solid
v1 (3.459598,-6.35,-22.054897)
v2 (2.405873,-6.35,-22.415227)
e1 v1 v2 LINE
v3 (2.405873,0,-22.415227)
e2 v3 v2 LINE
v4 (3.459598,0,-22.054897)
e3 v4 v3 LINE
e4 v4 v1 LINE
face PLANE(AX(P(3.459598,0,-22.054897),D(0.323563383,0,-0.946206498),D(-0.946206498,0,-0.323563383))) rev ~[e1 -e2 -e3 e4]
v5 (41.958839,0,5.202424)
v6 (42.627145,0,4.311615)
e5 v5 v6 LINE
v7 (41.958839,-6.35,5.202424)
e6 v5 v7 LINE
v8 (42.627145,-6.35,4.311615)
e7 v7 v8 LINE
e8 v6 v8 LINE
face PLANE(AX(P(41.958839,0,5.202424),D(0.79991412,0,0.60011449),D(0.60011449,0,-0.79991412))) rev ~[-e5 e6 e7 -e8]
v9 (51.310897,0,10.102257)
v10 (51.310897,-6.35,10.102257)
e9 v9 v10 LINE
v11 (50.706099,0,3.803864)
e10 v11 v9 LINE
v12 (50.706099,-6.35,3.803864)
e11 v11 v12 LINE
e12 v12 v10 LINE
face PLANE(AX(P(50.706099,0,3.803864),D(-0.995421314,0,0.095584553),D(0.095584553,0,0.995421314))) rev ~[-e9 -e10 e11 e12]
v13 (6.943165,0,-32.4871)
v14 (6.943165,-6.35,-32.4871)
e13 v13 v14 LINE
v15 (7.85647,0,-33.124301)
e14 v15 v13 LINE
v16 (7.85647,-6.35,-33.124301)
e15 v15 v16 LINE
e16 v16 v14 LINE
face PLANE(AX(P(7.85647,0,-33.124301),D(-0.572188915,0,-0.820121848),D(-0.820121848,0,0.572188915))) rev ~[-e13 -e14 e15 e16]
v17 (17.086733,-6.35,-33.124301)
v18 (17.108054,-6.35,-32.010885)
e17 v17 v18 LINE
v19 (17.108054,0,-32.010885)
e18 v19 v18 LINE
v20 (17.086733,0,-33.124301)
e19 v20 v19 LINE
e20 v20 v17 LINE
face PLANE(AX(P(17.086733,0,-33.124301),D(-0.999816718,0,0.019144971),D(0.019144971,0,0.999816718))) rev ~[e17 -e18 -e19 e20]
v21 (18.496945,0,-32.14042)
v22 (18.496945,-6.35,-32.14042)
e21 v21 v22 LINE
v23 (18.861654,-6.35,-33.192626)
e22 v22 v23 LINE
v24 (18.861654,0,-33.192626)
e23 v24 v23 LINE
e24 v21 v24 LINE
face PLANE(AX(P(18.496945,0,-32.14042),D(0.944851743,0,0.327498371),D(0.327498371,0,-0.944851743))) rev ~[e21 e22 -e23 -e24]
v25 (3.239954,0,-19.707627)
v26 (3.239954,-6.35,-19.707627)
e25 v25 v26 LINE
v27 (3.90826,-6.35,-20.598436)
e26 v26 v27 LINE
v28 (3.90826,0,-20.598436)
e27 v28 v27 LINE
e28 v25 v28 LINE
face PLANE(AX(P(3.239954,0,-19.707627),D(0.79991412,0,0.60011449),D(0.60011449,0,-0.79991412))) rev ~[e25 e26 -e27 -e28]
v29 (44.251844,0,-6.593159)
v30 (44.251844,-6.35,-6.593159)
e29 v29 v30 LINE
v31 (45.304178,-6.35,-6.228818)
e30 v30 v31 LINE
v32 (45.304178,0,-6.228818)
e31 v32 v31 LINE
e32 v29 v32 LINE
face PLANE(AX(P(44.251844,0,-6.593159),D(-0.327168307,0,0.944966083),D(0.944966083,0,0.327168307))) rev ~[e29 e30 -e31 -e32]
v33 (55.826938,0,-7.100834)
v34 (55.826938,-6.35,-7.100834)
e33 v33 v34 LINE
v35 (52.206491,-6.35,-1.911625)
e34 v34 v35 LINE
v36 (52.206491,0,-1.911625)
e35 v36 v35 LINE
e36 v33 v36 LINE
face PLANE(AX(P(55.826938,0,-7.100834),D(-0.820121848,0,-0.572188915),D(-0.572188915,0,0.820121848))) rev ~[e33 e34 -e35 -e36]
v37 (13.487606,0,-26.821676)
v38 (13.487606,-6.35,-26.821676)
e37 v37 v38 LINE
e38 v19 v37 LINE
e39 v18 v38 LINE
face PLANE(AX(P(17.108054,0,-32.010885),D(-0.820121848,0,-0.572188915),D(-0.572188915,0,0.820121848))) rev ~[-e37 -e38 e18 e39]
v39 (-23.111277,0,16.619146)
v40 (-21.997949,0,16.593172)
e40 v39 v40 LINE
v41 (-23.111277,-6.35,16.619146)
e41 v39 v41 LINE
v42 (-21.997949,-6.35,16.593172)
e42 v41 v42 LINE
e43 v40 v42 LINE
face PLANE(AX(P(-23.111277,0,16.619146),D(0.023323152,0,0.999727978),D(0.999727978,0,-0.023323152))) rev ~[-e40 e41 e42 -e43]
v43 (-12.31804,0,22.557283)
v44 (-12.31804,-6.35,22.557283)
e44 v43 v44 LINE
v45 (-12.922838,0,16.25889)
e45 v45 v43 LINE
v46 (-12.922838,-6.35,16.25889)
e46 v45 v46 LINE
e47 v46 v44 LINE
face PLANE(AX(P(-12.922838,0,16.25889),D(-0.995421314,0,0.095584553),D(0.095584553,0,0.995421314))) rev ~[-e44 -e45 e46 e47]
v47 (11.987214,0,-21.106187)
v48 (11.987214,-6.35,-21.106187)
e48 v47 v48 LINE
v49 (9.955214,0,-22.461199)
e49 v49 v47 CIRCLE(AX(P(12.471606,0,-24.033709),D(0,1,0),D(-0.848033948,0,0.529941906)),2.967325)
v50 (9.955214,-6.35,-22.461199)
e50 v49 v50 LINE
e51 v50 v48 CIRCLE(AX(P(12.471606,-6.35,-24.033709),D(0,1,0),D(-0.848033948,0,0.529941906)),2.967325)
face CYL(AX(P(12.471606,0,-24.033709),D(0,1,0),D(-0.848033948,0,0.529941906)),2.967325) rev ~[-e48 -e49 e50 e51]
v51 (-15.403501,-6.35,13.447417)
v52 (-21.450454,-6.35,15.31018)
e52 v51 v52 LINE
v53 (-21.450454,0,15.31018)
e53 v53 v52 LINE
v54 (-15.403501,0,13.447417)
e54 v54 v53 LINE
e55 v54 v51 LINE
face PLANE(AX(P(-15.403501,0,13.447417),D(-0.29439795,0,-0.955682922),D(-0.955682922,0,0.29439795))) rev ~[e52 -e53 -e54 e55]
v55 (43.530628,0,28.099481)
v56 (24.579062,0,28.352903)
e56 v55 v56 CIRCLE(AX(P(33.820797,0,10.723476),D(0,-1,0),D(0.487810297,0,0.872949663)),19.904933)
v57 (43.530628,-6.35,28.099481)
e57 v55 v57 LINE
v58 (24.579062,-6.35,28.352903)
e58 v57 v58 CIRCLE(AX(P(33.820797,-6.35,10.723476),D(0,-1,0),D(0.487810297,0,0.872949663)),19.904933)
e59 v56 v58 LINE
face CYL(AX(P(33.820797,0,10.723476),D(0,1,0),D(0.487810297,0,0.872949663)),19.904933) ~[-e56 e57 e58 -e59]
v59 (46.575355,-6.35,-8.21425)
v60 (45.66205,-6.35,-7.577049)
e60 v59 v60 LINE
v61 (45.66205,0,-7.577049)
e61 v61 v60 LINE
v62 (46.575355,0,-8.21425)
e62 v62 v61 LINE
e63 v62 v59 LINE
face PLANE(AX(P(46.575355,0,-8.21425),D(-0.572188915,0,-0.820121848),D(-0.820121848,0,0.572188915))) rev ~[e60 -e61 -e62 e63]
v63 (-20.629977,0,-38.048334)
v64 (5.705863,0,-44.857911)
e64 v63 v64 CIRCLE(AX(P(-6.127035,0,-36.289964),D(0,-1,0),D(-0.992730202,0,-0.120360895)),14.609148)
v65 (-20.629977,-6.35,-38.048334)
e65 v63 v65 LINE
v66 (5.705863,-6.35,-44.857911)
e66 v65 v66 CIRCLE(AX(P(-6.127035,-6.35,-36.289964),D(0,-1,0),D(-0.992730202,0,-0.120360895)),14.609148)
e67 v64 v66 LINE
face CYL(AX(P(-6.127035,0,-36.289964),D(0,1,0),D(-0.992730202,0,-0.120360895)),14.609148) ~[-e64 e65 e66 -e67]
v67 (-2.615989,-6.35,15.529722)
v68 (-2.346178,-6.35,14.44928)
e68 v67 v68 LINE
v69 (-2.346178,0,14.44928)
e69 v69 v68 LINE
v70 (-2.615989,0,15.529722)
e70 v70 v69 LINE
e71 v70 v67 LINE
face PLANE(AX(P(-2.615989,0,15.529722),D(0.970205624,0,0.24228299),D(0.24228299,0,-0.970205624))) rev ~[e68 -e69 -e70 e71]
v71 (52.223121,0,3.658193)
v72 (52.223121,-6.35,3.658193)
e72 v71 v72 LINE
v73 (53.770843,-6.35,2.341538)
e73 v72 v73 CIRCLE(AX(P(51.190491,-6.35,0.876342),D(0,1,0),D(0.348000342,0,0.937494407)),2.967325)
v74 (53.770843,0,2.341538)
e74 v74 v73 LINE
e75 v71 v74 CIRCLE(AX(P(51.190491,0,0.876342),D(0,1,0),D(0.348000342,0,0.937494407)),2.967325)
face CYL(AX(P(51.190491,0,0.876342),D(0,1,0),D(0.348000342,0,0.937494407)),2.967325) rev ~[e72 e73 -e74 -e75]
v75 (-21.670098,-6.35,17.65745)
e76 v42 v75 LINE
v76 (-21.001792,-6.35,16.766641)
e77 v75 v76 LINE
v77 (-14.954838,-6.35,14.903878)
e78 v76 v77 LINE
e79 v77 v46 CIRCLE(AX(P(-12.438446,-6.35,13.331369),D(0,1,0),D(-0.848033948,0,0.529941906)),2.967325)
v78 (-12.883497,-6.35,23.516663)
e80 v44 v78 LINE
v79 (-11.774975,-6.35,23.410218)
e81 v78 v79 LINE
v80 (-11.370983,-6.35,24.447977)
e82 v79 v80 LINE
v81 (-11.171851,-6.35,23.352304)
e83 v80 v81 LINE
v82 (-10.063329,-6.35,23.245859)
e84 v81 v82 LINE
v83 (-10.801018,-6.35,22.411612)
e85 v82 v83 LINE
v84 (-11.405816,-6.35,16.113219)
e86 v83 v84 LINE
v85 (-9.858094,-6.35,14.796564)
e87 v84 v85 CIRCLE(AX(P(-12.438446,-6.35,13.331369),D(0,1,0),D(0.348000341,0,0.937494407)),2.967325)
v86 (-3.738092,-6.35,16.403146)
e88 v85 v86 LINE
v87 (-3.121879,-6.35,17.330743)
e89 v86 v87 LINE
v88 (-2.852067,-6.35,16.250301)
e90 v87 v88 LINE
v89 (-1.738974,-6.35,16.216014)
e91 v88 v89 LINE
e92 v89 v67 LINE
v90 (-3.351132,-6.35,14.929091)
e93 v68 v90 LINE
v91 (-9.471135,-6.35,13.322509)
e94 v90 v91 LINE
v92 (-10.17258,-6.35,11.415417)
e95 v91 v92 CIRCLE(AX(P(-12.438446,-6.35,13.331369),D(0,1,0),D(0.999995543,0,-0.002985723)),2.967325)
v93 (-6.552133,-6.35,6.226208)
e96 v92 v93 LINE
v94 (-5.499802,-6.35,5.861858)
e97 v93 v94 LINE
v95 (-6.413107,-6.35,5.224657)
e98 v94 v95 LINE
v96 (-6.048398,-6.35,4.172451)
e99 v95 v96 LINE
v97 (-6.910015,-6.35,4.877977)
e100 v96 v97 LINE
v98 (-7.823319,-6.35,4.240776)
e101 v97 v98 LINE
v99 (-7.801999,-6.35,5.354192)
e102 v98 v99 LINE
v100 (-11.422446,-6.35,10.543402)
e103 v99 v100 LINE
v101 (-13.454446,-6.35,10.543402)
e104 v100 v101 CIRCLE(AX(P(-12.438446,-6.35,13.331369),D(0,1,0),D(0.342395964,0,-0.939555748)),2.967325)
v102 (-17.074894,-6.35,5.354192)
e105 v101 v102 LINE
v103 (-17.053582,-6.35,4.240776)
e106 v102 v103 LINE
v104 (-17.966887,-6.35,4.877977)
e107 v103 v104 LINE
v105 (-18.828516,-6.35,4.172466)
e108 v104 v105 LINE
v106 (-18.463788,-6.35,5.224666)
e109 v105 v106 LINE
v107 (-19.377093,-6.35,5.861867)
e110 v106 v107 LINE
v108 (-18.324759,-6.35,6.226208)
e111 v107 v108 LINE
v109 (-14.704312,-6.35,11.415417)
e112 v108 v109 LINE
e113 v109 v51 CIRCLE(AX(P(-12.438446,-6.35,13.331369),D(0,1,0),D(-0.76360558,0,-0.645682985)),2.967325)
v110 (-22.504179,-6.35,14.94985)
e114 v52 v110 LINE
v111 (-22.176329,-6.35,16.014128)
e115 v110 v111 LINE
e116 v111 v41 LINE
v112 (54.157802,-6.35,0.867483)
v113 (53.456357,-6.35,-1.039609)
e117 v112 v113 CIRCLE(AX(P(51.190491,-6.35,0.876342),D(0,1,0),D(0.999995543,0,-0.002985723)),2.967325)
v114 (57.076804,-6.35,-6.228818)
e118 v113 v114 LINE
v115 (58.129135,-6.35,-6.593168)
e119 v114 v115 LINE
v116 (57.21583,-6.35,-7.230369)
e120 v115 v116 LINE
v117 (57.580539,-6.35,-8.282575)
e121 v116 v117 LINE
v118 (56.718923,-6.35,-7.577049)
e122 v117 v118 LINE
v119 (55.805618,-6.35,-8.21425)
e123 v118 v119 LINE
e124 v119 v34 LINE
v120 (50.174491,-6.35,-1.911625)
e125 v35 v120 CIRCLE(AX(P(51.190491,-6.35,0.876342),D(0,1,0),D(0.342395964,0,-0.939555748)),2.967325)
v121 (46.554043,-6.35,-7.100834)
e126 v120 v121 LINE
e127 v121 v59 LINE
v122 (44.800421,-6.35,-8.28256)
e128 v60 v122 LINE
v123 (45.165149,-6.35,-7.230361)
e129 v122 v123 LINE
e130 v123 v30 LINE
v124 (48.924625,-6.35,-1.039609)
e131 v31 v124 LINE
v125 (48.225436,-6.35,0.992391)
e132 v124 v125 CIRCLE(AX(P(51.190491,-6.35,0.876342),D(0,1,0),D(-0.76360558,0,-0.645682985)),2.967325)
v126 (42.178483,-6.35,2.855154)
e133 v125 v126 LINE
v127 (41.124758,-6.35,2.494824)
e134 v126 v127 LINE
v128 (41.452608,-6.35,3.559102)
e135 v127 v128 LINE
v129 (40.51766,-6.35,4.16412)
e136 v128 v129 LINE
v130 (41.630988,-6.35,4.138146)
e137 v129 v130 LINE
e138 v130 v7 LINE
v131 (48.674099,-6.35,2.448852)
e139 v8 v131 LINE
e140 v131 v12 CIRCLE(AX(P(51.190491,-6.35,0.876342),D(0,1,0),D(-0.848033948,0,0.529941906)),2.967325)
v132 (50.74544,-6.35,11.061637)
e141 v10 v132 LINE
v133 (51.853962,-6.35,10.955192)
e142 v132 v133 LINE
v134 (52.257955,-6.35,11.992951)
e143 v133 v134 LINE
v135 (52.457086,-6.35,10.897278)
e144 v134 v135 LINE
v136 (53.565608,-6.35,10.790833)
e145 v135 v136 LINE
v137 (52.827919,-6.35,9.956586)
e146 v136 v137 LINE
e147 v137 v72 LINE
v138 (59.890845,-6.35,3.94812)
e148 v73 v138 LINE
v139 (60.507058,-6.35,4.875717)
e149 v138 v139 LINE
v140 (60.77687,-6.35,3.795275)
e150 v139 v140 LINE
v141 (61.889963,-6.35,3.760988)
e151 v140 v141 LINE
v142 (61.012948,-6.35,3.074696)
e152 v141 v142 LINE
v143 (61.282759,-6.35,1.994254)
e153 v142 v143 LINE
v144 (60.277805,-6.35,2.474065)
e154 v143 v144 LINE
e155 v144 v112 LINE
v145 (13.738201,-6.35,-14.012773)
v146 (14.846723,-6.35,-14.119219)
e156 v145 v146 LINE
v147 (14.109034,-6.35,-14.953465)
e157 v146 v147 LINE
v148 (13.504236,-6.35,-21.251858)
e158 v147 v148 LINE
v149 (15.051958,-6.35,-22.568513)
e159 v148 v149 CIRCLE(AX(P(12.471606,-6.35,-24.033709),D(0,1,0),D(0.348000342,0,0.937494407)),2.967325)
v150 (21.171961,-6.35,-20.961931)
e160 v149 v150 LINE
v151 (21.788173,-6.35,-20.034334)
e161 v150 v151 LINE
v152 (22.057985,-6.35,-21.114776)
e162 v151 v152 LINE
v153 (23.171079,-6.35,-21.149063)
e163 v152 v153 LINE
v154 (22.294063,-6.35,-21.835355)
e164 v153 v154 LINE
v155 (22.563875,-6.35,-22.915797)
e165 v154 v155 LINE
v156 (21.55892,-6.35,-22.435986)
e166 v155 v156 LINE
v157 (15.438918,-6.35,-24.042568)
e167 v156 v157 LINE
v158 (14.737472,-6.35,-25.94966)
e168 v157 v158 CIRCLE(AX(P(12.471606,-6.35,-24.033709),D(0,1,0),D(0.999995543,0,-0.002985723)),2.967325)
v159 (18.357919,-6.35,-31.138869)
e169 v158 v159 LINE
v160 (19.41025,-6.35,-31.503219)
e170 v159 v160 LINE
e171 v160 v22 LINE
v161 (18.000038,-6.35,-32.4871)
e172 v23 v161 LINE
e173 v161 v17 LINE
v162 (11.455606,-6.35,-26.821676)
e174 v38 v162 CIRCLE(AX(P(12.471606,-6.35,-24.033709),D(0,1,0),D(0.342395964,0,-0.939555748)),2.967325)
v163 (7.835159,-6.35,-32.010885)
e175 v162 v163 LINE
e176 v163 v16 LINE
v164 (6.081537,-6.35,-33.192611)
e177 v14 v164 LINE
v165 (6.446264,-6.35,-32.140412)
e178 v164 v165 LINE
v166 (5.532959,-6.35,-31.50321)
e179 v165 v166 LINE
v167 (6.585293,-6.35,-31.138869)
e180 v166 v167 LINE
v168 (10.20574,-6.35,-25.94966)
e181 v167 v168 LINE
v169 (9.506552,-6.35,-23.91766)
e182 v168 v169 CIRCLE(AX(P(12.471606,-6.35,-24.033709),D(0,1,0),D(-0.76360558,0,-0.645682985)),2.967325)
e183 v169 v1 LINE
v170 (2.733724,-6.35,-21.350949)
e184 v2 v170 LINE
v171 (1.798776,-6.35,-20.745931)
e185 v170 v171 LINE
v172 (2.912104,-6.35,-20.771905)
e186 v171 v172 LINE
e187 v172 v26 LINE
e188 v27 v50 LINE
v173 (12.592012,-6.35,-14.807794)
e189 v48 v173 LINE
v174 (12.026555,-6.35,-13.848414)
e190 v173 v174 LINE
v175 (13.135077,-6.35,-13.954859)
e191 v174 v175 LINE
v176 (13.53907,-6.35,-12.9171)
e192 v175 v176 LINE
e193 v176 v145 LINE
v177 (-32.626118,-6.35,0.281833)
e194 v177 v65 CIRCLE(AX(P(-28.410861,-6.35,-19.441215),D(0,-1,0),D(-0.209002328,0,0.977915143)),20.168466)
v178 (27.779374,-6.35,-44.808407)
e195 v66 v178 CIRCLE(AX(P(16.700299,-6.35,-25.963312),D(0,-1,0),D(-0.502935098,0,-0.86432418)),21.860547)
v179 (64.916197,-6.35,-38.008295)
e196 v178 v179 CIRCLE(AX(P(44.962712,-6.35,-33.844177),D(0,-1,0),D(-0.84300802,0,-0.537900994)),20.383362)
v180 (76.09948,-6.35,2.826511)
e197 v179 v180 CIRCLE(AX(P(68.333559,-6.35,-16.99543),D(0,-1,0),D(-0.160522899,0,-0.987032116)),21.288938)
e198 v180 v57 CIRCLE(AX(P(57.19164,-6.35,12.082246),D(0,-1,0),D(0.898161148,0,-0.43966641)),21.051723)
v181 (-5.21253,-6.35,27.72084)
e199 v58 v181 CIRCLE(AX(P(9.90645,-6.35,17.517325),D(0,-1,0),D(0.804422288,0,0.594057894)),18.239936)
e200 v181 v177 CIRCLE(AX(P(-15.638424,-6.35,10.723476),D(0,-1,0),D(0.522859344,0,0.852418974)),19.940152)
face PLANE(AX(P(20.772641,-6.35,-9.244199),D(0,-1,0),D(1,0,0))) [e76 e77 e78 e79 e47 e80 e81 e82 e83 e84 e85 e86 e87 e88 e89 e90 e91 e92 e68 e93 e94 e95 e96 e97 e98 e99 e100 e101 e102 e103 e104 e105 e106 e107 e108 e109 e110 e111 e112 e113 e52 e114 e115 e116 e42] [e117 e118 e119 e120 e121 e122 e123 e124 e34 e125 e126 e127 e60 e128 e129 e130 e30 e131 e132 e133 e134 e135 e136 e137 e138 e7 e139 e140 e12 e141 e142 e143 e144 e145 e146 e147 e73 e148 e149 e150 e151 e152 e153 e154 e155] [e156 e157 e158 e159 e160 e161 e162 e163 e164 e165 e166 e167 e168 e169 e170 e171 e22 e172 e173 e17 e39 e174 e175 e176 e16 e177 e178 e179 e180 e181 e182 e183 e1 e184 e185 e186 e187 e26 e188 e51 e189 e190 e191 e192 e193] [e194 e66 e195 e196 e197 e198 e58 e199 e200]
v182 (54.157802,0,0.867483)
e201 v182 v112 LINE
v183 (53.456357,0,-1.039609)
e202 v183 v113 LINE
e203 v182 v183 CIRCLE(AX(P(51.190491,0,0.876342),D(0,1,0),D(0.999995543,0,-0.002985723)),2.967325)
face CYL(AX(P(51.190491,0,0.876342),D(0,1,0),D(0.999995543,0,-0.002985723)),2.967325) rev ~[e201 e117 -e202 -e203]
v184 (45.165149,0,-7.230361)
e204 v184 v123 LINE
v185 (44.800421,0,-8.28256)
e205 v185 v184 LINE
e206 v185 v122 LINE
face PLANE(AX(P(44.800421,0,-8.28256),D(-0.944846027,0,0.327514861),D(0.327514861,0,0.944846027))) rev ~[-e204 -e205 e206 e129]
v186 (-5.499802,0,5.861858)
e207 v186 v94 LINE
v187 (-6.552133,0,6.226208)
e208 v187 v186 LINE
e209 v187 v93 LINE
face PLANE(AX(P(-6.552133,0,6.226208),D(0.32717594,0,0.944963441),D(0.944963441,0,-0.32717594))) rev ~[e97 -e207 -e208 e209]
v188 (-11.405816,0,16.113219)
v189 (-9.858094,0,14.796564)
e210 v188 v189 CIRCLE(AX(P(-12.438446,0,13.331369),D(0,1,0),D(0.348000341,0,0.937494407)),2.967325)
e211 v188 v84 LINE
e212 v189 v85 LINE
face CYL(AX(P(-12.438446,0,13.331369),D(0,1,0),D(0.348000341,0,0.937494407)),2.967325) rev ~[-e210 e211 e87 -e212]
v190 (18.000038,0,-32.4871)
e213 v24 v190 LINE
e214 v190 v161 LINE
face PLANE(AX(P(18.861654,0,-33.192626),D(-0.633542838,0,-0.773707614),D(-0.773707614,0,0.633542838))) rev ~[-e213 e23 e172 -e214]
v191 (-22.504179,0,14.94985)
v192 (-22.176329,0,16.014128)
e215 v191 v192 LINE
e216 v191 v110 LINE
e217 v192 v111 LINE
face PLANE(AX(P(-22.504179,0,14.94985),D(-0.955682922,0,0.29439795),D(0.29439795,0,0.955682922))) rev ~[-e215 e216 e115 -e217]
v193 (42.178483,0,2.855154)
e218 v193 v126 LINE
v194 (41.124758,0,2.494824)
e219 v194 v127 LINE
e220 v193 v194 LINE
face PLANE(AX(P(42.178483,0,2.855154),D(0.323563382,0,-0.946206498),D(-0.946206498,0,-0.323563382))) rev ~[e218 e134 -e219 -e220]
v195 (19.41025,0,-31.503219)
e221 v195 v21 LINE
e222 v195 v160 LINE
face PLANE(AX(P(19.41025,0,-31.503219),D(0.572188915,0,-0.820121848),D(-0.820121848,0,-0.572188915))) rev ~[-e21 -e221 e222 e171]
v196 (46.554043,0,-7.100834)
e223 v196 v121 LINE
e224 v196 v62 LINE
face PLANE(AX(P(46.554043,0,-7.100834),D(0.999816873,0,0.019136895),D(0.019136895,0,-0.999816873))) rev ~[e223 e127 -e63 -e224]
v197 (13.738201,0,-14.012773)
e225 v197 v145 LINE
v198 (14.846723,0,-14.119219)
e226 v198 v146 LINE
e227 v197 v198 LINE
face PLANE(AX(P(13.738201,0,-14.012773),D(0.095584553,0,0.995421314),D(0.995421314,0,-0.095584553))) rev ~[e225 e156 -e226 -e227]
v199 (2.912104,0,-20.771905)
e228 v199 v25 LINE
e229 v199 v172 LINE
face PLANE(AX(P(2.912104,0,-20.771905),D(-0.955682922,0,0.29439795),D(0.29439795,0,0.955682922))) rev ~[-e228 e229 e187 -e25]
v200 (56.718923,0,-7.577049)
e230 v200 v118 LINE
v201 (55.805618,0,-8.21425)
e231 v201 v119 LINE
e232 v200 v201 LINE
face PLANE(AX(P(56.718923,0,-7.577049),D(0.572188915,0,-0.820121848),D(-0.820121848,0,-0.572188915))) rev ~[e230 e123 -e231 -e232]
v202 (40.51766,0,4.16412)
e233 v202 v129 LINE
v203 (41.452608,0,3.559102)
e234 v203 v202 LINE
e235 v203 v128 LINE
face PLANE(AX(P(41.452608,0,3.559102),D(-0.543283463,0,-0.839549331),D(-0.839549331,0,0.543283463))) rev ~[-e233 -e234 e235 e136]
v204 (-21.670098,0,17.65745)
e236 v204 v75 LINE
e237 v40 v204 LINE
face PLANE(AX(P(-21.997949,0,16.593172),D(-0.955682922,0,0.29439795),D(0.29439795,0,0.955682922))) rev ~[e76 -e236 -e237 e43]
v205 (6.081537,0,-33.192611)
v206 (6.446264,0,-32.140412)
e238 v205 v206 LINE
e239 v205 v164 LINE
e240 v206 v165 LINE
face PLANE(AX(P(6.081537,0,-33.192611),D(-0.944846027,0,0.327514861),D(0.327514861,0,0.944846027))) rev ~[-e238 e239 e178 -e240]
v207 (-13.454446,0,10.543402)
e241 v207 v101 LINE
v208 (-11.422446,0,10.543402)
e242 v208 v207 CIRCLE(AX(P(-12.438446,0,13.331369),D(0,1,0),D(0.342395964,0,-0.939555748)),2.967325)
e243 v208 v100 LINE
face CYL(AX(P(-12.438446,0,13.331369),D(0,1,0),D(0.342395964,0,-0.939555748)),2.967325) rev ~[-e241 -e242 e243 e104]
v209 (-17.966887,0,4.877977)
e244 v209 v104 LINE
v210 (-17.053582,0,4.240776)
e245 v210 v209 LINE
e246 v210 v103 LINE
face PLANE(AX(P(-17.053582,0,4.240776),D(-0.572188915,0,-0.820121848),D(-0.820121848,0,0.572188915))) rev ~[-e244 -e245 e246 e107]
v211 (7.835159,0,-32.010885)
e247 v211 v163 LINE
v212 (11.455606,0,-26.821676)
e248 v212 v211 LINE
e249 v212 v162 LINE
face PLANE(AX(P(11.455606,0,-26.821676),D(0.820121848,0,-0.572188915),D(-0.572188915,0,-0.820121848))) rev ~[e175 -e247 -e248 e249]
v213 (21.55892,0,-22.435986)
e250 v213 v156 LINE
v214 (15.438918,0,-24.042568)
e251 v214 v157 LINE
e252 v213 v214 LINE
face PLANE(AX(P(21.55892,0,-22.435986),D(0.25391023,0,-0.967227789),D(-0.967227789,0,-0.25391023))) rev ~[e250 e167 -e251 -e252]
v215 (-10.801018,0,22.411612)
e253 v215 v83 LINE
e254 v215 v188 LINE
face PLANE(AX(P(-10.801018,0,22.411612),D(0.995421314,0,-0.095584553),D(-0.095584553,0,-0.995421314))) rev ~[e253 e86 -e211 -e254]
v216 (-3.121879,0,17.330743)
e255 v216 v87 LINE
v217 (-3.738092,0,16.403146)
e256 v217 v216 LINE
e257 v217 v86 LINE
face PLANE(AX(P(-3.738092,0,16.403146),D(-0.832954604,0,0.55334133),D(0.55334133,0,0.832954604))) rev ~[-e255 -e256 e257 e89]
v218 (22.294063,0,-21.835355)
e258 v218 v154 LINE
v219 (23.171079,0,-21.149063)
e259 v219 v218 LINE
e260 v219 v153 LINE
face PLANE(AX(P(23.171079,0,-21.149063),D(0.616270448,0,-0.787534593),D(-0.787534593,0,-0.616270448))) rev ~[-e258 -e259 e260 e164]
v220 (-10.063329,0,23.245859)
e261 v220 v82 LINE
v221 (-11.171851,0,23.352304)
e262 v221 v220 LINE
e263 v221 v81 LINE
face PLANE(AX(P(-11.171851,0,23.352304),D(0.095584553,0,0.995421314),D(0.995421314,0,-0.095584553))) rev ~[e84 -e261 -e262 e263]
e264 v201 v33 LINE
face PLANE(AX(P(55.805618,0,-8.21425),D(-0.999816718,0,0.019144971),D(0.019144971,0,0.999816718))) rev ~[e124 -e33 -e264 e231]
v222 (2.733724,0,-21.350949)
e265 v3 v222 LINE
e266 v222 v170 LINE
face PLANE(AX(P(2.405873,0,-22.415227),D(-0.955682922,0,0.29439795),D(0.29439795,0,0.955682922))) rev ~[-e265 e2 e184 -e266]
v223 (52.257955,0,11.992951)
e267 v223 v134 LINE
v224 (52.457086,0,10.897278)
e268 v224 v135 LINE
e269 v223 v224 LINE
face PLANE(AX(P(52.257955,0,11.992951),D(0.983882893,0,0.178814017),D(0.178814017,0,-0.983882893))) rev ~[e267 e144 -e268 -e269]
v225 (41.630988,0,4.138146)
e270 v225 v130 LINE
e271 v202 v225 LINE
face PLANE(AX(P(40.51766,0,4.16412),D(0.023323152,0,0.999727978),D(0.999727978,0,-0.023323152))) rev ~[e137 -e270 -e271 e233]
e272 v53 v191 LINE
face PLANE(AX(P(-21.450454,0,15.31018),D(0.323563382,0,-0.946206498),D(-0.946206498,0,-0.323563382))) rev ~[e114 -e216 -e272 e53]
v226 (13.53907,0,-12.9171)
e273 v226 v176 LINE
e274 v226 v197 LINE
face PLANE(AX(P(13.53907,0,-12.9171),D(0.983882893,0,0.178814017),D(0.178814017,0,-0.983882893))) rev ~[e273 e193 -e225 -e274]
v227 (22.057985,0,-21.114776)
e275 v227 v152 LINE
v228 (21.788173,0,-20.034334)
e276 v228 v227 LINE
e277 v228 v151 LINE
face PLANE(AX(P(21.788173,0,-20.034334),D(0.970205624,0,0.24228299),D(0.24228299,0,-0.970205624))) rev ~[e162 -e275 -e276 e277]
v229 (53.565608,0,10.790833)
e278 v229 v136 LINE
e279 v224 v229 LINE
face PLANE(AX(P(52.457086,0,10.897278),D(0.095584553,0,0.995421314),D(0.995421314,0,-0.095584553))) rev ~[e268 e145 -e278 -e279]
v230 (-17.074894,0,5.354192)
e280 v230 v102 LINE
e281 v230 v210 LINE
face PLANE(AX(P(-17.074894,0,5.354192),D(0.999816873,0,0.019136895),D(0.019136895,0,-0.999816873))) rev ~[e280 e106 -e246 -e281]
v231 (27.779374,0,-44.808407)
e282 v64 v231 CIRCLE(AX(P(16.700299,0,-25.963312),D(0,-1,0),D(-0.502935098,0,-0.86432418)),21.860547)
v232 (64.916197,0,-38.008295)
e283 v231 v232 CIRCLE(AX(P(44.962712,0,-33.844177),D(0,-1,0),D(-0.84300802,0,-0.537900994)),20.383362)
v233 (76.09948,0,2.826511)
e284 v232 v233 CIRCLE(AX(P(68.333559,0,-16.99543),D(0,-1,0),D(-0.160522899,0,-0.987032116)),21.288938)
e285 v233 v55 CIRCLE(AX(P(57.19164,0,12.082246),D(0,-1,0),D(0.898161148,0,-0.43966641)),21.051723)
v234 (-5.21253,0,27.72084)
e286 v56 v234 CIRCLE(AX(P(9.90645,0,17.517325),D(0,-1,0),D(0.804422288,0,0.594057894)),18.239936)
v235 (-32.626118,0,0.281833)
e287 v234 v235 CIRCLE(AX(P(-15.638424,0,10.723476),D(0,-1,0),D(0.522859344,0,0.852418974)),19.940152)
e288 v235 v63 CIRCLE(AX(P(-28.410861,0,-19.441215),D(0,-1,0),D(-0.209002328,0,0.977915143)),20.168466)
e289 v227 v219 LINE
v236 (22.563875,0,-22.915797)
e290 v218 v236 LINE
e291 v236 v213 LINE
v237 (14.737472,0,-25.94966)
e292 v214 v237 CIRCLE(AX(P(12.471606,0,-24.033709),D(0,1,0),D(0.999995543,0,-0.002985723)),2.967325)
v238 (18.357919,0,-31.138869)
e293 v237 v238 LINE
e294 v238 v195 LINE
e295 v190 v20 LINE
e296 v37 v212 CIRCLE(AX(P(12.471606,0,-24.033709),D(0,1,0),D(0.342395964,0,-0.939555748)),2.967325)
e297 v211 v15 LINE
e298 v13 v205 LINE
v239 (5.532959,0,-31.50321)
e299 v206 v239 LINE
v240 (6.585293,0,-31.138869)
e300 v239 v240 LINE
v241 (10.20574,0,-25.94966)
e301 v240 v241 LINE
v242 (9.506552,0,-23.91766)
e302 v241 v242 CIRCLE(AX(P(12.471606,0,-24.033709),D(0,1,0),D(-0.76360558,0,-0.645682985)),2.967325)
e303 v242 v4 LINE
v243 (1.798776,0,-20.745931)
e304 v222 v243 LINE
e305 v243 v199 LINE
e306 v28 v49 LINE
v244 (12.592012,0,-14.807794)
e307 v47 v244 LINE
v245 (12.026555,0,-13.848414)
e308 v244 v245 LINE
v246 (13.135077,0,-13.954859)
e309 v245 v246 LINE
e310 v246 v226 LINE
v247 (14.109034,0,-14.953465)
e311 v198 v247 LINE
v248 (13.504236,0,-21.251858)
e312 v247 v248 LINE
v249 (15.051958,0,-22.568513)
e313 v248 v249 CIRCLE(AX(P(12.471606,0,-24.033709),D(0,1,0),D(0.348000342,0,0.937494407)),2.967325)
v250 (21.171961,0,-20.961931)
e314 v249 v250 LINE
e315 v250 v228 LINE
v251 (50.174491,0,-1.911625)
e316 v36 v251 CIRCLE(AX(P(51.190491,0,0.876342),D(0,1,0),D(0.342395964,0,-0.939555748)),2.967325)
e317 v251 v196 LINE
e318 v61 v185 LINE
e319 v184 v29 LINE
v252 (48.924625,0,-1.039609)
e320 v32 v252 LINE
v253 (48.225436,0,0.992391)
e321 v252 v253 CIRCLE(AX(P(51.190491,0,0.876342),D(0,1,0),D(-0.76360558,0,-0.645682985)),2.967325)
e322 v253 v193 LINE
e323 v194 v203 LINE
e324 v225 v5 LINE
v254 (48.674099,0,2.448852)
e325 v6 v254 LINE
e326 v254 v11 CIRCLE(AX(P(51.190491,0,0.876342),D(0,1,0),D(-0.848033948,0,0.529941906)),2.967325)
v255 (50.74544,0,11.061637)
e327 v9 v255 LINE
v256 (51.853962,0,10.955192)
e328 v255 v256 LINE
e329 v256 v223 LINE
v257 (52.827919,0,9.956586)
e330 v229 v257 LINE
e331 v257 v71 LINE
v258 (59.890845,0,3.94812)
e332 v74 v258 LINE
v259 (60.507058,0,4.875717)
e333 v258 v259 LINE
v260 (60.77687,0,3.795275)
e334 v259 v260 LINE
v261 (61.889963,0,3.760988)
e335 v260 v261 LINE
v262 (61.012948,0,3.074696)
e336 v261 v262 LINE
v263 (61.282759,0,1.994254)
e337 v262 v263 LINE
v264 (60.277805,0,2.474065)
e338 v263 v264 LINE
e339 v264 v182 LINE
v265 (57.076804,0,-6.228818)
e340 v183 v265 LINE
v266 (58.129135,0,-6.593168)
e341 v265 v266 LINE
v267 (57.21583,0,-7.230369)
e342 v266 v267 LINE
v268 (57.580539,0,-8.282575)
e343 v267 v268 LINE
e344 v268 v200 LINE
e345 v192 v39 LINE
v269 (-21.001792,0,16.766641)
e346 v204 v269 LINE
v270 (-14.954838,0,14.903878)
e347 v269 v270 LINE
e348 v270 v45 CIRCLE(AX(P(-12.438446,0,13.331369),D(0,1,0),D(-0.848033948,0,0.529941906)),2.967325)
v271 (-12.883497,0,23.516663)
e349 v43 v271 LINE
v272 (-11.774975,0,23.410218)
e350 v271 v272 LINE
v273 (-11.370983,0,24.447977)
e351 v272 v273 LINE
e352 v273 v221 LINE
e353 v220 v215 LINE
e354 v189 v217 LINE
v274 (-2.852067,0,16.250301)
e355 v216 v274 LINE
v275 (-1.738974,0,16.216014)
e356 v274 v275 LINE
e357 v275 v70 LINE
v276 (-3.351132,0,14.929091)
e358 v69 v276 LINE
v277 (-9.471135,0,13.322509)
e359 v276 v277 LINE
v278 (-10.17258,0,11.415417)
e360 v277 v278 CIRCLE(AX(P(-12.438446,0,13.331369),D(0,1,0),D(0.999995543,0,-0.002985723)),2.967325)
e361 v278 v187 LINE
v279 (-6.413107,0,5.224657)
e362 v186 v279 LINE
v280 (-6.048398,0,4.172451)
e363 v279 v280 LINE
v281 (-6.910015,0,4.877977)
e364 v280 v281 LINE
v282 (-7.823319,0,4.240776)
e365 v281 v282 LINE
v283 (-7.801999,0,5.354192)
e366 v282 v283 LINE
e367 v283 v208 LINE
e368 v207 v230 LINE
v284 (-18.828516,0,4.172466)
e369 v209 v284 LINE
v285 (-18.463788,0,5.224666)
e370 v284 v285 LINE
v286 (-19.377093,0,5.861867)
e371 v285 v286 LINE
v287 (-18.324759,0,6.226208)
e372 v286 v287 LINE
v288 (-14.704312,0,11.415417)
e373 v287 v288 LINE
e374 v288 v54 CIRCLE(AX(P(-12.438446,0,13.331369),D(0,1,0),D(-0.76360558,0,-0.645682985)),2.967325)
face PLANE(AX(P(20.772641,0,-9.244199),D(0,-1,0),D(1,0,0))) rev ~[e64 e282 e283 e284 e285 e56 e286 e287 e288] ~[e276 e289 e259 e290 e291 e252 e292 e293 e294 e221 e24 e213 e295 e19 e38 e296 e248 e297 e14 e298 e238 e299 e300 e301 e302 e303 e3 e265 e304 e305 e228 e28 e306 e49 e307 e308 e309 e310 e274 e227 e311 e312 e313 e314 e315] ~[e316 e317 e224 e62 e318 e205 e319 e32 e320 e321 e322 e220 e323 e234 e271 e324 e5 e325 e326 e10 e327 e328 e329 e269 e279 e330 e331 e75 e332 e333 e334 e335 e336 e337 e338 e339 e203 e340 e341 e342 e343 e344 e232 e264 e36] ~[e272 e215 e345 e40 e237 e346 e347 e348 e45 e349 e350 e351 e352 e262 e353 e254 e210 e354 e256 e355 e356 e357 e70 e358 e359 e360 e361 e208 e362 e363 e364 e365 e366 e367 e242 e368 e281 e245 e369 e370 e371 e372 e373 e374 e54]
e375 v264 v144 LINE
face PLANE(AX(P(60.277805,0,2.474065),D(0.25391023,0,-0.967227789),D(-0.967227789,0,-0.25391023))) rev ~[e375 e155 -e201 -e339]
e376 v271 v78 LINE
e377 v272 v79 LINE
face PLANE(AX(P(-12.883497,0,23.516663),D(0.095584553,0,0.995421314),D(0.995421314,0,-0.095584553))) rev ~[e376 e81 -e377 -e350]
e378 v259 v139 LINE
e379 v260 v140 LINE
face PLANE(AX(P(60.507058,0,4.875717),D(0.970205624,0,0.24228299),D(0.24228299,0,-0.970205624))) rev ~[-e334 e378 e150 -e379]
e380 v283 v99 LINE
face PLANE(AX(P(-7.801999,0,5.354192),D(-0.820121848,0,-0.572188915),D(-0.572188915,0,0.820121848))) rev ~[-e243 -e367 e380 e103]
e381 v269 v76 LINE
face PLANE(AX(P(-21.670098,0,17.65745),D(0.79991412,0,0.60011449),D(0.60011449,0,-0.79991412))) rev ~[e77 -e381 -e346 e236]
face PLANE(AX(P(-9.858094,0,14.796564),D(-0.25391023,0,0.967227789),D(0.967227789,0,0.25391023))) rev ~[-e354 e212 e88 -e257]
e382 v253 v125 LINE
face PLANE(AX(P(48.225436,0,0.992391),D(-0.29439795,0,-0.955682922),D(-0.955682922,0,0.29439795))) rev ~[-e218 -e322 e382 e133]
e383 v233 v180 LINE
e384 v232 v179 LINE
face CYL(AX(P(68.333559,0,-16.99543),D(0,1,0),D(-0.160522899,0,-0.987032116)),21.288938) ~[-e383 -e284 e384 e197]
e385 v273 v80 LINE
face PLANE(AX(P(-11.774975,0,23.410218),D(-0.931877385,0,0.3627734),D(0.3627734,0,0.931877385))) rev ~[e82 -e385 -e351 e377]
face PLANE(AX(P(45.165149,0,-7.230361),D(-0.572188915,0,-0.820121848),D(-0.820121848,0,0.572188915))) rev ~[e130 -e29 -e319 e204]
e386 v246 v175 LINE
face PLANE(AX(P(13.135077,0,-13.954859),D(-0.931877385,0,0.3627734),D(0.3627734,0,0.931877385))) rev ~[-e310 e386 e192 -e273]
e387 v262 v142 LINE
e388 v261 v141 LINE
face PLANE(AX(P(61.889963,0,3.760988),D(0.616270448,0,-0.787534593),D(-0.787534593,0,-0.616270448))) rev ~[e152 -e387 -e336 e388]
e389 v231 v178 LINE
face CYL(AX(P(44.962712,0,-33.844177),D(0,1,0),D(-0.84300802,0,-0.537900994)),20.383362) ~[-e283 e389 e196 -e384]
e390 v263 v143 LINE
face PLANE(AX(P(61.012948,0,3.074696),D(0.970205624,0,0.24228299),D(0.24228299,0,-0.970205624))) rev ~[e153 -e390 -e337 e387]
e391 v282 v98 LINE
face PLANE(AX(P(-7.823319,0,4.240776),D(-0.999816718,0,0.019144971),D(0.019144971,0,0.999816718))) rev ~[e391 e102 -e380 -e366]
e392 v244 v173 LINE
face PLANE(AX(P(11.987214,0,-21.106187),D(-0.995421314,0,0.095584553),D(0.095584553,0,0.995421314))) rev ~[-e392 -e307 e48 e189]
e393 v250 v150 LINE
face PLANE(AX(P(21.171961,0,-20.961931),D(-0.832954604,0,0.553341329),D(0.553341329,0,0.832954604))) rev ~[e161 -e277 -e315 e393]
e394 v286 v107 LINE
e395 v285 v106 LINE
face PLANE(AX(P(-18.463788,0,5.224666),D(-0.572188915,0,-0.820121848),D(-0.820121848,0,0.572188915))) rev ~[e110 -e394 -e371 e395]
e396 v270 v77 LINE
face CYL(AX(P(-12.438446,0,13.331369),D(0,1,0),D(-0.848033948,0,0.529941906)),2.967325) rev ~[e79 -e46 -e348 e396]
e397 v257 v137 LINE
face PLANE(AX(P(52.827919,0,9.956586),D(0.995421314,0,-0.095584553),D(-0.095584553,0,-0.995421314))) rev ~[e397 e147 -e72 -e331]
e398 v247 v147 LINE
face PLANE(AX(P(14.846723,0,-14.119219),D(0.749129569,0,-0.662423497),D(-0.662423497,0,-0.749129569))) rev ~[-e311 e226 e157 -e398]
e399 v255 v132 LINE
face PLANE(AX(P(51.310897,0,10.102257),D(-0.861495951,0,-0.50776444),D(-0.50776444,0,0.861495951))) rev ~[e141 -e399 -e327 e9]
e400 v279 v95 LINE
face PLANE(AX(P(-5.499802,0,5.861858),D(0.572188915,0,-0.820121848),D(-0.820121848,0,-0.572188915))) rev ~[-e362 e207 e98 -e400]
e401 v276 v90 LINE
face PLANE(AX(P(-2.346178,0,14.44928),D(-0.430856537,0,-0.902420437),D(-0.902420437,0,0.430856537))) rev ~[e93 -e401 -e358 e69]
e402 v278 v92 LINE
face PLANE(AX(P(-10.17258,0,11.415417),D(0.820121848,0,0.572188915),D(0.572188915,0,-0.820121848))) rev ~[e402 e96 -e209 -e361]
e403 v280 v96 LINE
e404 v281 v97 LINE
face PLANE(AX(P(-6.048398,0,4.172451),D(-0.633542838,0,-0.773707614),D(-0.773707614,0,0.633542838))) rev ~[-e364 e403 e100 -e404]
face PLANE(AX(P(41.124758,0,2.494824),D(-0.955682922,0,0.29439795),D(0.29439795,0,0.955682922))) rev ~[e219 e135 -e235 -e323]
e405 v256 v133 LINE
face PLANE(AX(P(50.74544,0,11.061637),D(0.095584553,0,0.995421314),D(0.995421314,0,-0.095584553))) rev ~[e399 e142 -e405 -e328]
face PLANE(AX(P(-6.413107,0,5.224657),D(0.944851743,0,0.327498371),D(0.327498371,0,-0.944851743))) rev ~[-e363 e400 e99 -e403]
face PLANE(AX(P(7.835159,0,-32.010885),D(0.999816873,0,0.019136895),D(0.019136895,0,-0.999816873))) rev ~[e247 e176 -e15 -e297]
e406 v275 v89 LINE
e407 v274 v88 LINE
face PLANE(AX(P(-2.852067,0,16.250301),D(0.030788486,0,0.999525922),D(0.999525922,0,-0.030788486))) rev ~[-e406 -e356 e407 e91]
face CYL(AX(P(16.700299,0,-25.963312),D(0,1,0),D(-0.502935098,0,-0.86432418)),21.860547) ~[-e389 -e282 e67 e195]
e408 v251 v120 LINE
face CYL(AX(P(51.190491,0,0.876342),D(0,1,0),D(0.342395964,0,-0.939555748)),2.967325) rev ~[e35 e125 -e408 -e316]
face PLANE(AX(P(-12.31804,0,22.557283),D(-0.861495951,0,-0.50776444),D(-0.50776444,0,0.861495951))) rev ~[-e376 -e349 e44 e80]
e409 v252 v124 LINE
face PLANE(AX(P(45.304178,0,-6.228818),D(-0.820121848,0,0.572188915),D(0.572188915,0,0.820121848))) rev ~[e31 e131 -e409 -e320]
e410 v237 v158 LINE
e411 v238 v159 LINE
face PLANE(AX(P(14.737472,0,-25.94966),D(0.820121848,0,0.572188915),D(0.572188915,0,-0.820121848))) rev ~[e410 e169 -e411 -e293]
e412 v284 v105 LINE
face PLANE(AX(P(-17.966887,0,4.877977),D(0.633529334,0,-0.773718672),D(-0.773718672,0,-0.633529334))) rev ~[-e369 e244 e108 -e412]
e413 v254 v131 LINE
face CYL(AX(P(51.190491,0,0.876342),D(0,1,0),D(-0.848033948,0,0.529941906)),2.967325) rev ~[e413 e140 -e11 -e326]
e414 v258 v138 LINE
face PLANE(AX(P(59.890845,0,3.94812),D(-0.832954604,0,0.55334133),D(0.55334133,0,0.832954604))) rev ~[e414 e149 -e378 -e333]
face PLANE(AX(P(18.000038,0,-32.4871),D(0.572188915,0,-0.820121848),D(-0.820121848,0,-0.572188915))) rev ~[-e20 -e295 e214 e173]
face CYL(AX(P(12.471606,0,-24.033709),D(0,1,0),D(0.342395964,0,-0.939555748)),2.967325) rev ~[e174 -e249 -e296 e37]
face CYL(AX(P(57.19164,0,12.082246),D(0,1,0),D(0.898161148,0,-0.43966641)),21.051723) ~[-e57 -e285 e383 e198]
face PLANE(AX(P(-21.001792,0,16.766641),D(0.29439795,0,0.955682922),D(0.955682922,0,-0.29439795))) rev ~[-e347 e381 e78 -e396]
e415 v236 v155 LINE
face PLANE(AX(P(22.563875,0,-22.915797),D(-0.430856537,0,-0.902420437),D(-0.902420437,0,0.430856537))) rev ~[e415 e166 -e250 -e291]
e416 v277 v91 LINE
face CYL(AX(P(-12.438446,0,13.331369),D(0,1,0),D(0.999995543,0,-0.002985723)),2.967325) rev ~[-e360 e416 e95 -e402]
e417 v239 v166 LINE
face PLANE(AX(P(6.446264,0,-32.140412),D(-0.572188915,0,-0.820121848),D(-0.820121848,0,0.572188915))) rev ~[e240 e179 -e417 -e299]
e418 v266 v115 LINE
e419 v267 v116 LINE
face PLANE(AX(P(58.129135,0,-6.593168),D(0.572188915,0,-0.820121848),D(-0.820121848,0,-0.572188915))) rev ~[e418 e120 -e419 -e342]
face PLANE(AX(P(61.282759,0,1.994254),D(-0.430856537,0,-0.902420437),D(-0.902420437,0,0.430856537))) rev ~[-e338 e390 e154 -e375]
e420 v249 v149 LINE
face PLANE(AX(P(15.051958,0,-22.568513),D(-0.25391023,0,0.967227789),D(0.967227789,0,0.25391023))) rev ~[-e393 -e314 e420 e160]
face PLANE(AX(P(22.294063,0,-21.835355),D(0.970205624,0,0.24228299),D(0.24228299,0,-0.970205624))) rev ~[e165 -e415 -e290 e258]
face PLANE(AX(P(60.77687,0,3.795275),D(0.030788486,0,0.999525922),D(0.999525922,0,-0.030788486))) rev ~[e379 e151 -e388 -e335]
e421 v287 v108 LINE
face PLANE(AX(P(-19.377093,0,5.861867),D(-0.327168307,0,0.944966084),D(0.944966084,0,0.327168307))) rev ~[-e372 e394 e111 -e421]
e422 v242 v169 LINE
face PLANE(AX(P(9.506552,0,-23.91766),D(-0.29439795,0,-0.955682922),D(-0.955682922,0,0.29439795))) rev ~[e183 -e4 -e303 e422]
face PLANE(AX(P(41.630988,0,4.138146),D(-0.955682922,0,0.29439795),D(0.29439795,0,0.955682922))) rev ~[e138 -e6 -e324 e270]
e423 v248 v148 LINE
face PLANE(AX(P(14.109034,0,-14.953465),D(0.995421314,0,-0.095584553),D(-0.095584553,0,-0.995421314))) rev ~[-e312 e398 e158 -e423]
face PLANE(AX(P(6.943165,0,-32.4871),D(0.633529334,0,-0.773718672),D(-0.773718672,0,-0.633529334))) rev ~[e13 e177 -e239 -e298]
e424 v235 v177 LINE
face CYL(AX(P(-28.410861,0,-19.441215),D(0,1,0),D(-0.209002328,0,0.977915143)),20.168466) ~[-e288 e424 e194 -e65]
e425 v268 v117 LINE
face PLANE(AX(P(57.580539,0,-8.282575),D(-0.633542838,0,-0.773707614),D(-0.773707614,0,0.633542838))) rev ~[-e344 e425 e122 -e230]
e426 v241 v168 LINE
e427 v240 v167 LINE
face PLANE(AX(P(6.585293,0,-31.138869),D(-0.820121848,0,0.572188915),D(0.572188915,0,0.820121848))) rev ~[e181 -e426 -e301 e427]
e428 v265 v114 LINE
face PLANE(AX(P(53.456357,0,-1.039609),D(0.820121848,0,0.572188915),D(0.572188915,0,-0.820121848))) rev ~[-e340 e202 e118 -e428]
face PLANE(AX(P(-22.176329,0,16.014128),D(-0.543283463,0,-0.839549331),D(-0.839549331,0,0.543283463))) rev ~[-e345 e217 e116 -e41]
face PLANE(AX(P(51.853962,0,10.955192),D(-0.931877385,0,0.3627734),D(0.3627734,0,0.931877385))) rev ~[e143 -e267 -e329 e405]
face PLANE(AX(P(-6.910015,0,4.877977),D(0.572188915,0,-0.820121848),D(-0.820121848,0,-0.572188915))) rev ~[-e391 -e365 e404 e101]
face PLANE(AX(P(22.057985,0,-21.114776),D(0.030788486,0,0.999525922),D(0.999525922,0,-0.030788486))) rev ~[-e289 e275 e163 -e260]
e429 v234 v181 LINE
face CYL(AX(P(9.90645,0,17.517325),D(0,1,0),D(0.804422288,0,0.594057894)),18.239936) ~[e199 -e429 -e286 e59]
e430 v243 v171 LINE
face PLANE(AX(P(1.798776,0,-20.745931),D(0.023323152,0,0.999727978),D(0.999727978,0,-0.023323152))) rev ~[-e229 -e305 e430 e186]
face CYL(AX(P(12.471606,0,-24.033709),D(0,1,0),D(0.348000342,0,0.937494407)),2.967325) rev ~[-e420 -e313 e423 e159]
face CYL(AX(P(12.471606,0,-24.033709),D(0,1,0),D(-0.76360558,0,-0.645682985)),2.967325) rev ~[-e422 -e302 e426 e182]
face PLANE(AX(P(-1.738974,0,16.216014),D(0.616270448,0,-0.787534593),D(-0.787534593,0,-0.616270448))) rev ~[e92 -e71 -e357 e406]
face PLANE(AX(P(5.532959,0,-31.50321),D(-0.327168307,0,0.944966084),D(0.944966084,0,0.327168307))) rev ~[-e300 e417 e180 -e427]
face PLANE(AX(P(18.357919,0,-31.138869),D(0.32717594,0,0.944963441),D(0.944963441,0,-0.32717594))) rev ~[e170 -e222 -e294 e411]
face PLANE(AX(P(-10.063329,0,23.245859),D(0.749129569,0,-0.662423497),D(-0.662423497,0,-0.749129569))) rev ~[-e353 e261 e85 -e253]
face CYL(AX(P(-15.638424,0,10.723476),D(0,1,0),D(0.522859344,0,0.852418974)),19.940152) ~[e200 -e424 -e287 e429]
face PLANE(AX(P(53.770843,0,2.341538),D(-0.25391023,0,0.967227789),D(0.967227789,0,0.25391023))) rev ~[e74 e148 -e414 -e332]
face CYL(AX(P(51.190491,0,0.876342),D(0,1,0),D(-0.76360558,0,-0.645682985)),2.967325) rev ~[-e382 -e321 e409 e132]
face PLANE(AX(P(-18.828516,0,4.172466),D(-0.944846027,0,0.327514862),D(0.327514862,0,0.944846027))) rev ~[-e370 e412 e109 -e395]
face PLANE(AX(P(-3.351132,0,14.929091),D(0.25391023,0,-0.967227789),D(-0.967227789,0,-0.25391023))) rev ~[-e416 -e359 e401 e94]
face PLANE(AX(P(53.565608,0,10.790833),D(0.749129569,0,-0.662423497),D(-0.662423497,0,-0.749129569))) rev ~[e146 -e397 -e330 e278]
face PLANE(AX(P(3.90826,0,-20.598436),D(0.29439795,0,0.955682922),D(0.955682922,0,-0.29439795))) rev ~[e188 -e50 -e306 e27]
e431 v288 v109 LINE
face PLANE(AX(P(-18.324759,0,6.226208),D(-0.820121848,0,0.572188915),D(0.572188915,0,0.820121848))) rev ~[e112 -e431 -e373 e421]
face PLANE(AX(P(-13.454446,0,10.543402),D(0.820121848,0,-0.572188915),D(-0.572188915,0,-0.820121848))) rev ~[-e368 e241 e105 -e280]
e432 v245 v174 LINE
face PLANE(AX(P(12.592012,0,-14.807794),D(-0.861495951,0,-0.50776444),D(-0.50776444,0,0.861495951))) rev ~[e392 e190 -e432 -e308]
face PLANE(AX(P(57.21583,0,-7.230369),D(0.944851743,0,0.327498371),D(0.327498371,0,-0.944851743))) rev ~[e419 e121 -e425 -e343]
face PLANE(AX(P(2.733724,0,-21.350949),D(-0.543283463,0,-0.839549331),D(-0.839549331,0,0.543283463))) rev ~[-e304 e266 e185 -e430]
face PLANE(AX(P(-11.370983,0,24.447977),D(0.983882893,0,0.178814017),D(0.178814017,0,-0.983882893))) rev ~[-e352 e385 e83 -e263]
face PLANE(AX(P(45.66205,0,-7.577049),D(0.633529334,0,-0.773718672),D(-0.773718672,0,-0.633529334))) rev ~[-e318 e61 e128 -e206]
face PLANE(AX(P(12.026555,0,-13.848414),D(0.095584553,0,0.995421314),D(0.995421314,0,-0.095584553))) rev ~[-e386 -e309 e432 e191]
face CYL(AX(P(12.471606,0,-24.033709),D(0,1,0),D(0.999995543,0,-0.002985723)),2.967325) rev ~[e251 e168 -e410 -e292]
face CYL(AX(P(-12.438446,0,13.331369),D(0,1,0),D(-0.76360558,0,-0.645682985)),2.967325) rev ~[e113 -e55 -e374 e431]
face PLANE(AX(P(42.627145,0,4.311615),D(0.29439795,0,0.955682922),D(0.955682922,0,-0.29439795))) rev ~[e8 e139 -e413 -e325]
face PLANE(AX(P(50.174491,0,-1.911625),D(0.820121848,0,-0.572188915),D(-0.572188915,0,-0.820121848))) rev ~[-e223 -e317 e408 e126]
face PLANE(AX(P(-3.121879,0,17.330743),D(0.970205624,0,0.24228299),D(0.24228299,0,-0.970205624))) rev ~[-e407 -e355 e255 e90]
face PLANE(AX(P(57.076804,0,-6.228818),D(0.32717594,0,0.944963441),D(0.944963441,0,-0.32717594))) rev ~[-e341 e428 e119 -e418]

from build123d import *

# Parameters (mm, degrees)
F1_DEPTH = 6.35


# Not quite as in the source:
# - a length typed as a fraction of an inch, garbled in the dataset ("3 / 203.2 mm" for 3/8 in), is restored


with BuildPart() as f1:
    # F0 (on Front) → F1 (new body)
    with BuildSketch(Plane.XZ):
        with BuildLine():
            ThreePointArc((24.579061552, 28.3529026657), (9.5195561517, 35.7531570559), (-5.2125295141, 27.720839839))
            ThreePointArc((-5.2125295141, 27.720839839), (-29.7447728029, 24.816757347), (-32.6261176355, 0.281833099))
            ThreePointArc((-32.6261176355, 0.281833099), (-47.6586884842, -25.465181848), (-20.6299769397, -38.0483339671))
            ThreePointArc((-20.6299769397, -38.0483339671), (-9.7842016961, -50.4339494071), (5.705863164, -44.8579112888))
            ThreePointArc((5.705863164, -44.8579112888), (16.7493256027, -47.8238039479), (27.779373908, -44.8084074092))
            ThreePointArc((27.779373908, -44.8084074092), (48.6340616912, -53.8941801606), (64.9161967707, -38.0082950333))
            ThreePointArc((64.9161967707, -38.0082950333), (88.8664062791, -22.618688114), (76.0994801139, 2.8265105082))
            ThreePointArc((76.0994801139, 2.8265105082), (70.0975710942, 28.7139027136), (43.5306278663, 28.0994805429))
            ThreePointArc((43.5306278663, 28.0994805429), (34.0869435906, 30.6266295541), (24.579061552, 28.3529026657))
        make_face()
        with BuildLine():
            ThreePointArc((9.9552140403, -22.4611988481), (10.8253405255, -21.564938524), (11.9872140403, -21.1061873886))
            Line((11.9872140403, -21.1061873886), (12.5920123004, -14.8077944269))
            Line((12.5920123004, -14.8077944269), (12.0265549094, -13.8484140251))
            Line((12.0265549094, -13.8484140251), (13.1350774738, -13.9548590377))
            Line((13.1350774738, -13.9548590377), (13.5390697269, -12.9171003587))
            Line((13.5390697269, -12.9171003587), (13.7382008585, -14.0127734892))
            Line((13.7382008585, -14.0127734892), (14.8467234229, -14.1192185018))
            Line((14.8467234229, -14.1192185018), (14.1090343836, -14.9534652864))
            Line((14.1090343836, -14.9534652864), (13.5042361235, -21.2518582481))
            ThreePointArc((13.5042361235, -21.2518582481), (14.3943138922, -21.7735734557), (15.0519583946, -22.5685130135))
            Line((15.0519583946, -22.5685130135), (21.1719606568, -20.9619305704))
            Line((21.1719606568, -20.9619305704), (21.788173451, -20.0343344251))
            Line((21.788173451, -20.0343344251), (22.0579849941, -21.114776255))
            Line((22.0579849941, -21.114776255), (23.1710785379, -21.1490629746))
            Line((23.1710785379, -21.1490629746), (22.2940630935, -21.8353549873))
            Line((22.2940630935, -21.8353549873), (22.5638746366, -22.9157968171))
            Line((22.5638746366, -22.9157968171), (21.5589198477, -22.4359857202))
            Line((21.5589198477, -22.4359857202), (15.4389175856, -24.0425681633))
            ThreePointArc((15.4389175856, -24.0425681633), (15.2565271687, -25.0580281222), (14.7374718125, -25.9496596209))
            Line((14.7374718125, -25.9496596209), (18.3579193376, -31.1388690552))
            Line((18.3579193376, -31.1388690552), (19.4102498473, -31.5032188374))
            Line((19.4102498473, -31.5032188374), (18.4969454746, -32.1404200522))
            Line((18.4969454746, -32.1404200522), (18.8616543221, -33.1926261736))
            Line((18.8616543221, -33.1926261736), (18.0000377843, -32.487099982))
            Line((18.0000377843, -32.487099982), (17.0867334116, -33.1243011968))
            Line((17.0867334116, -33.1243011968), (17.1080536411, -32.0108849615))
            Line((17.1080536411, -32.0108849615), (13.487606116, -26.8216755271))
            ThreePointArc((13.487606116, -26.8216755271), (12.471606116, -27.0010332485), (11.455606116, -26.8216755271))
            Line((11.455606116, -26.8216755271), (7.835158591, -32.0108849615))
            Line((7.835158591, -32.0108849615), (7.8564698266, -33.124301369))
            Line((7.8564698266, -33.124301369), (6.9431654539, -32.4871001542))
            Line((6.9431654539, -32.4871001542), (6.0815366025, -33.1926113076))
            Line((6.0815366025, -33.1926113076), (6.4462638144, -32.1404115518))
            Line((6.4462638144, -32.1404115518), (5.5329594417, -31.5032103369))
            Line((5.5329594417, -31.5032103369), (6.5852928945, -31.1388690552))
            Line((6.5852928945, -31.1388690552), (10.2057404195, -25.9496596209))
            ThreePointArc((10.2057404195, -25.9496596209), (9.6657394654, -24.9991764128), (9.5065515642, -23.9176596209))
            Line((9.5065515642, -23.9176596209), (3.4595978764, -22.0548966372))
            Line((3.4595978764, -22.0548966372), (2.4058730089, -22.4152268431))
            Line((2.4058730089, -22.4152268431), (2.7337236859, -21.3509487369))
            Line((2.7337236859, -21.3509487369), (1.7987755438, -20.7459314434))
            Line((1.7987755438, -20.7459314434), (2.9121035894, -20.7719048279))
            Line((2.9121035894, -20.7719048279), (3.2399542664, -19.7076267216))
            Line((3.2399542664, -19.7076267216), (3.9082603526, -20.5984358645))
            Line((3.9082603526, -20.5984358645), (9.9552140403, -22.4611988481))
        make_face(mode=Mode.SUBTRACT)
        with BuildLine():
            ThreePointArc((-14.9548382666, 14.9038782153), (-14.0847117815, 15.8001385395), (-12.9228382666, 16.2588896749))
            Line((-12.9228382666, 16.2588896749), (-12.3180400065, 22.5572826366))
            Line((-12.3180400065, 22.5572826366), (-12.8834973975, 23.5166630384))
            Line((-12.8834973975, 23.5166630384), (-11.7749748332, 23.4102180258))
            Line((-11.7749748332, 23.4102180258), (-11.37098258, 24.4479767047))
            Line((-11.37098258, 24.4479767047), (-11.1718514484, 23.3523035743))
            Line((-11.1718514484, 23.3523035743), (-10.0633288841, 23.2458585617))
            Line((-10.0633288841, 23.2458585617), (-10.8010179234, 22.411611777))
            Line((-10.8010179234, 22.411611777), (-11.4058161835, 16.1132188153))
            ThreePointArc((-11.4058161835, 16.1132188153), (-10.5157384147, 15.5915036078), (-9.8580939123, 14.7965640499))
            Line((-9.8580939123, 14.7965640499), (-3.7380916502, 16.4031464931))
            Line((-3.7380916502, 16.4031464931), (-3.121878856, 17.3307426383))
            Line((-3.121878856, 17.3307426383), (-2.8520673129, 16.2503008085))
            Line((-2.8520673129, 16.2503008085), (-1.7389737691, 16.2160140888))
            Line((-1.7389737691, 16.2160140888), (-2.6159892135, 15.5297220761))
            Line((-2.6159892135, 15.5297220761), (-2.3461776704, 14.4492802463))
            Line((-2.3461776704, 14.4492802463), (-3.3511324592, 14.9290913433))
            Line((-3.3511324592, 14.9290913433), (-9.4711347214, 13.3225089001))
            ThreePointArc((-9.4711347214, 13.3225089001), (-9.6535251382, 12.3070489413), (-10.1725804944, 11.4154174426))
            Line((-10.1725804944, 11.4154174426), (-6.5521329694, 6.2262080082))
            Line((-6.5521329694, 6.2262080082), (-5.4998024597, 5.8618582261))
            Line((-5.4998024597, 5.8618582261), (-6.4131068324, 5.2246570112))
            Line((-6.4131068324, 5.2246570112), (-6.0483979848, 4.1724508898))
            Line((-6.0483979848, 4.1724508898), (-6.9100145227, 4.8779770815))
            Line((-6.9100145227, 4.8779770815), (-7.8233188953, 4.2407758666))
            Line((-7.8233188953, 4.2407758666), (-7.8019986659, 5.354192102))
            Line((-7.8019986659, 5.354192102), (-11.4224461909, 10.5434015363))
            ThreePointArc((-11.4224461909, 10.5434015363), (-12.4384461909, 10.3640438149), (-13.4544461909, 10.5434015363))
            Line((-13.4544461909, 10.5434015363), (-17.0748937159, 5.354192102))
            Line((-17.0748937159, 5.354192102), (-17.0535824803, 4.2407756944))
            Line((-17.0535824803, 4.2407756944), (-17.966886853, 4.8779769093))
            Line((-17.966886853, 4.8779769093), (-18.8285157045, 4.1724657558))
            Line((-18.8285157045, 4.1724657558), (-18.4637884925, 5.2246655117))
            Line((-18.4637884925, 5.2246655117), (-19.3770928652, 5.8618667265))
            Line((-19.3770928652, 5.8618667265), (-18.3247594124, 6.2262080082))
            Line((-18.3247594124, 6.2262080082), (-14.7043118874, 11.4154174426))
            ThreePointArc((-14.7043118874, 11.4154174426), (-15.2443128415, 12.3659006506), (-15.4035007427, 13.4474174426))
            Line((-15.4035007427, 13.4474174426), (-21.4504544305, 15.3101804262))
            Line((-21.4504544305, 15.3101804262), (-22.5041792981, 14.9498502204))
            Line((-22.5041792981, 14.9498502204), (-22.176328621, 16.0141283266))
            Line((-22.176328621, 16.0141283266), (-23.1112767632, 16.61914562))
            Line((-23.1112767632, 16.61914562), (-21.9979487176, 16.5931722356))
            Line((-21.9979487176, 16.5931722356), (-21.6700980405, 17.6574503418))
            Line((-21.6700980405, 17.6574503418), (-21.0017919544, 16.7666411989))
            Line((-21.0017919544, 16.7666411989), (-14.9548382666, 14.9038782153))
        make_face(mode=Mode.SUBTRACT)
        with BuildLine():
            ThreePointArc((48.6740988512, 2.4488521783), (49.5442253363, 3.3451125024), (50.7060988512, 3.8038636378))
            Line((50.7060988512, 3.8038636378), (51.3108971112, 10.1022565995))
            Line((51.3108971112, 10.1022565995), (50.7454397202, 11.0616370013))
            Line((50.7454397202, 11.0616370013), (51.8539622846, 10.9551919887))
            Line((51.8539622846, 10.9551919887), (52.2579545378, 11.9929506677))
            Line((52.2579545378, 11.9929506677), (52.4570856693, 10.8972775372))
            Line((52.4570856693, 10.8972775372), (53.5656082337, 10.7908325246))
            Line((53.5656082337, 10.7908325246), (52.8279191944, 9.95658574))
            Line((52.8279191944, 9.95658574), (52.2231209343, 3.6581927783))
            ThreePointArc((52.2231209343, 3.6581927783), (53.113198703, 3.1364775707), (53.7708432054, 2.3415380128))
            Line((53.7708432054, 2.3415380128), (59.8908454676, 3.948120456))
            Line((59.8908454676, 3.948120456), (60.5070582618, 4.8757166012))
            Line((60.5070582618, 4.8757166012), (60.7768698049, 3.7952747714))
            Line((60.7768698049, 3.7952747714), (61.8899633487, 3.7609880518))
            Line((61.8899633487, 3.7609880518), (61.0129479043, 3.0746960391))
            Line((61.0129479043, 3.0746960391), (61.2827594474, 1.9942542093))
            Line((61.2827594474, 1.9942542093), (60.2778046585, 2.4740653062))
            Line((60.2778046585, 2.4740653062), (54.1578023964, 0.8674828631))
            ThreePointArc((54.1578023964, 0.8674828631), (53.9754119795, -0.1479770958), (53.4563566233, -1.0396085945))
            Line((53.4563566233, -1.0396085945), (57.0768041484, -6.2288180289))
            Line((57.0768041484, -6.2288180289), (58.1291346581, -6.593167811))
            Line((58.1291346581, -6.593167811), (57.2158302854, -7.2303690258))
            Line((57.2158302854, -7.2303690258), (57.5805391329, -8.2825751472))
            Line((57.5805391329, -8.2825751472), (56.7189225951, -7.5770489556))
            Line((56.7189225951, -7.5770489556), (55.8056182224, -8.2142501704))
            Line((55.8056182224, -8.2142501704), (55.8269384519, -7.1008339351))
            Line((55.8269384519, -7.1008339351), (52.2064909269, -1.9116245007))
            ThreePointArc((52.2064909269, -1.9116245007), (51.1904909269, -2.0909822221), (50.1744909269, -1.9116245007))
            Line((50.1744909269, -1.9116245007), (46.5540434018, -7.1008339351))
            Line((46.5540434018, -7.1008339351), (46.5753546374, -8.2142503426))
            Line((46.5753546374, -8.2142503426), (45.6620502647, -7.5770491278))
            Line((45.6620502647, -7.5770491278), (44.8004214133, -8.2825602812))
            Line((44.8004214133, -8.2825602812), (45.1651486252, -7.2303605254))
            Line((45.1651486252, -7.2303605254), (44.2518442526, -6.5931593106))
            Line((44.2518442526, -6.5931593106), (45.3041777053, -6.2288180289))
            Line((45.3041777053, -6.2288180289), (48.9246252304, -1.0396085945))
            ThreePointArc((48.9246252304, -1.0396085945), (48.3846242762, -0.0891253865), (48.225436375, 0.9923914055))
            Line((48.225436375, 0.9923914055), (42.1784826873, 2.8551543891))
            Line((42.1784826873, 2.8551543891), (41.1247578197, 2.4948241833))
            Line((41.1247578197, 2.4948241833), (41.4526084967, 3.5591022895))
            Line((41.4526084967, 3.5591022895), (40.5176603546, 4.164119583))
            Line((40.5176603546, 4.164119583), (41.6309884002, 4.1381461985))
            Line((41.6309884002, 4.1381461985), (41.9588390772, 5.2024243047))
            Line((41.9588390772, 5.2024243047), (42.6271451634, 4.3116151619))
            Line((42.6271451634, 4.3116151619), (48.6740988512, 2.4488521783))
        make_face(mode=Mode.SUBTRACT)
    extrude(amount=F1_DEPTH)


solid = f1.part
